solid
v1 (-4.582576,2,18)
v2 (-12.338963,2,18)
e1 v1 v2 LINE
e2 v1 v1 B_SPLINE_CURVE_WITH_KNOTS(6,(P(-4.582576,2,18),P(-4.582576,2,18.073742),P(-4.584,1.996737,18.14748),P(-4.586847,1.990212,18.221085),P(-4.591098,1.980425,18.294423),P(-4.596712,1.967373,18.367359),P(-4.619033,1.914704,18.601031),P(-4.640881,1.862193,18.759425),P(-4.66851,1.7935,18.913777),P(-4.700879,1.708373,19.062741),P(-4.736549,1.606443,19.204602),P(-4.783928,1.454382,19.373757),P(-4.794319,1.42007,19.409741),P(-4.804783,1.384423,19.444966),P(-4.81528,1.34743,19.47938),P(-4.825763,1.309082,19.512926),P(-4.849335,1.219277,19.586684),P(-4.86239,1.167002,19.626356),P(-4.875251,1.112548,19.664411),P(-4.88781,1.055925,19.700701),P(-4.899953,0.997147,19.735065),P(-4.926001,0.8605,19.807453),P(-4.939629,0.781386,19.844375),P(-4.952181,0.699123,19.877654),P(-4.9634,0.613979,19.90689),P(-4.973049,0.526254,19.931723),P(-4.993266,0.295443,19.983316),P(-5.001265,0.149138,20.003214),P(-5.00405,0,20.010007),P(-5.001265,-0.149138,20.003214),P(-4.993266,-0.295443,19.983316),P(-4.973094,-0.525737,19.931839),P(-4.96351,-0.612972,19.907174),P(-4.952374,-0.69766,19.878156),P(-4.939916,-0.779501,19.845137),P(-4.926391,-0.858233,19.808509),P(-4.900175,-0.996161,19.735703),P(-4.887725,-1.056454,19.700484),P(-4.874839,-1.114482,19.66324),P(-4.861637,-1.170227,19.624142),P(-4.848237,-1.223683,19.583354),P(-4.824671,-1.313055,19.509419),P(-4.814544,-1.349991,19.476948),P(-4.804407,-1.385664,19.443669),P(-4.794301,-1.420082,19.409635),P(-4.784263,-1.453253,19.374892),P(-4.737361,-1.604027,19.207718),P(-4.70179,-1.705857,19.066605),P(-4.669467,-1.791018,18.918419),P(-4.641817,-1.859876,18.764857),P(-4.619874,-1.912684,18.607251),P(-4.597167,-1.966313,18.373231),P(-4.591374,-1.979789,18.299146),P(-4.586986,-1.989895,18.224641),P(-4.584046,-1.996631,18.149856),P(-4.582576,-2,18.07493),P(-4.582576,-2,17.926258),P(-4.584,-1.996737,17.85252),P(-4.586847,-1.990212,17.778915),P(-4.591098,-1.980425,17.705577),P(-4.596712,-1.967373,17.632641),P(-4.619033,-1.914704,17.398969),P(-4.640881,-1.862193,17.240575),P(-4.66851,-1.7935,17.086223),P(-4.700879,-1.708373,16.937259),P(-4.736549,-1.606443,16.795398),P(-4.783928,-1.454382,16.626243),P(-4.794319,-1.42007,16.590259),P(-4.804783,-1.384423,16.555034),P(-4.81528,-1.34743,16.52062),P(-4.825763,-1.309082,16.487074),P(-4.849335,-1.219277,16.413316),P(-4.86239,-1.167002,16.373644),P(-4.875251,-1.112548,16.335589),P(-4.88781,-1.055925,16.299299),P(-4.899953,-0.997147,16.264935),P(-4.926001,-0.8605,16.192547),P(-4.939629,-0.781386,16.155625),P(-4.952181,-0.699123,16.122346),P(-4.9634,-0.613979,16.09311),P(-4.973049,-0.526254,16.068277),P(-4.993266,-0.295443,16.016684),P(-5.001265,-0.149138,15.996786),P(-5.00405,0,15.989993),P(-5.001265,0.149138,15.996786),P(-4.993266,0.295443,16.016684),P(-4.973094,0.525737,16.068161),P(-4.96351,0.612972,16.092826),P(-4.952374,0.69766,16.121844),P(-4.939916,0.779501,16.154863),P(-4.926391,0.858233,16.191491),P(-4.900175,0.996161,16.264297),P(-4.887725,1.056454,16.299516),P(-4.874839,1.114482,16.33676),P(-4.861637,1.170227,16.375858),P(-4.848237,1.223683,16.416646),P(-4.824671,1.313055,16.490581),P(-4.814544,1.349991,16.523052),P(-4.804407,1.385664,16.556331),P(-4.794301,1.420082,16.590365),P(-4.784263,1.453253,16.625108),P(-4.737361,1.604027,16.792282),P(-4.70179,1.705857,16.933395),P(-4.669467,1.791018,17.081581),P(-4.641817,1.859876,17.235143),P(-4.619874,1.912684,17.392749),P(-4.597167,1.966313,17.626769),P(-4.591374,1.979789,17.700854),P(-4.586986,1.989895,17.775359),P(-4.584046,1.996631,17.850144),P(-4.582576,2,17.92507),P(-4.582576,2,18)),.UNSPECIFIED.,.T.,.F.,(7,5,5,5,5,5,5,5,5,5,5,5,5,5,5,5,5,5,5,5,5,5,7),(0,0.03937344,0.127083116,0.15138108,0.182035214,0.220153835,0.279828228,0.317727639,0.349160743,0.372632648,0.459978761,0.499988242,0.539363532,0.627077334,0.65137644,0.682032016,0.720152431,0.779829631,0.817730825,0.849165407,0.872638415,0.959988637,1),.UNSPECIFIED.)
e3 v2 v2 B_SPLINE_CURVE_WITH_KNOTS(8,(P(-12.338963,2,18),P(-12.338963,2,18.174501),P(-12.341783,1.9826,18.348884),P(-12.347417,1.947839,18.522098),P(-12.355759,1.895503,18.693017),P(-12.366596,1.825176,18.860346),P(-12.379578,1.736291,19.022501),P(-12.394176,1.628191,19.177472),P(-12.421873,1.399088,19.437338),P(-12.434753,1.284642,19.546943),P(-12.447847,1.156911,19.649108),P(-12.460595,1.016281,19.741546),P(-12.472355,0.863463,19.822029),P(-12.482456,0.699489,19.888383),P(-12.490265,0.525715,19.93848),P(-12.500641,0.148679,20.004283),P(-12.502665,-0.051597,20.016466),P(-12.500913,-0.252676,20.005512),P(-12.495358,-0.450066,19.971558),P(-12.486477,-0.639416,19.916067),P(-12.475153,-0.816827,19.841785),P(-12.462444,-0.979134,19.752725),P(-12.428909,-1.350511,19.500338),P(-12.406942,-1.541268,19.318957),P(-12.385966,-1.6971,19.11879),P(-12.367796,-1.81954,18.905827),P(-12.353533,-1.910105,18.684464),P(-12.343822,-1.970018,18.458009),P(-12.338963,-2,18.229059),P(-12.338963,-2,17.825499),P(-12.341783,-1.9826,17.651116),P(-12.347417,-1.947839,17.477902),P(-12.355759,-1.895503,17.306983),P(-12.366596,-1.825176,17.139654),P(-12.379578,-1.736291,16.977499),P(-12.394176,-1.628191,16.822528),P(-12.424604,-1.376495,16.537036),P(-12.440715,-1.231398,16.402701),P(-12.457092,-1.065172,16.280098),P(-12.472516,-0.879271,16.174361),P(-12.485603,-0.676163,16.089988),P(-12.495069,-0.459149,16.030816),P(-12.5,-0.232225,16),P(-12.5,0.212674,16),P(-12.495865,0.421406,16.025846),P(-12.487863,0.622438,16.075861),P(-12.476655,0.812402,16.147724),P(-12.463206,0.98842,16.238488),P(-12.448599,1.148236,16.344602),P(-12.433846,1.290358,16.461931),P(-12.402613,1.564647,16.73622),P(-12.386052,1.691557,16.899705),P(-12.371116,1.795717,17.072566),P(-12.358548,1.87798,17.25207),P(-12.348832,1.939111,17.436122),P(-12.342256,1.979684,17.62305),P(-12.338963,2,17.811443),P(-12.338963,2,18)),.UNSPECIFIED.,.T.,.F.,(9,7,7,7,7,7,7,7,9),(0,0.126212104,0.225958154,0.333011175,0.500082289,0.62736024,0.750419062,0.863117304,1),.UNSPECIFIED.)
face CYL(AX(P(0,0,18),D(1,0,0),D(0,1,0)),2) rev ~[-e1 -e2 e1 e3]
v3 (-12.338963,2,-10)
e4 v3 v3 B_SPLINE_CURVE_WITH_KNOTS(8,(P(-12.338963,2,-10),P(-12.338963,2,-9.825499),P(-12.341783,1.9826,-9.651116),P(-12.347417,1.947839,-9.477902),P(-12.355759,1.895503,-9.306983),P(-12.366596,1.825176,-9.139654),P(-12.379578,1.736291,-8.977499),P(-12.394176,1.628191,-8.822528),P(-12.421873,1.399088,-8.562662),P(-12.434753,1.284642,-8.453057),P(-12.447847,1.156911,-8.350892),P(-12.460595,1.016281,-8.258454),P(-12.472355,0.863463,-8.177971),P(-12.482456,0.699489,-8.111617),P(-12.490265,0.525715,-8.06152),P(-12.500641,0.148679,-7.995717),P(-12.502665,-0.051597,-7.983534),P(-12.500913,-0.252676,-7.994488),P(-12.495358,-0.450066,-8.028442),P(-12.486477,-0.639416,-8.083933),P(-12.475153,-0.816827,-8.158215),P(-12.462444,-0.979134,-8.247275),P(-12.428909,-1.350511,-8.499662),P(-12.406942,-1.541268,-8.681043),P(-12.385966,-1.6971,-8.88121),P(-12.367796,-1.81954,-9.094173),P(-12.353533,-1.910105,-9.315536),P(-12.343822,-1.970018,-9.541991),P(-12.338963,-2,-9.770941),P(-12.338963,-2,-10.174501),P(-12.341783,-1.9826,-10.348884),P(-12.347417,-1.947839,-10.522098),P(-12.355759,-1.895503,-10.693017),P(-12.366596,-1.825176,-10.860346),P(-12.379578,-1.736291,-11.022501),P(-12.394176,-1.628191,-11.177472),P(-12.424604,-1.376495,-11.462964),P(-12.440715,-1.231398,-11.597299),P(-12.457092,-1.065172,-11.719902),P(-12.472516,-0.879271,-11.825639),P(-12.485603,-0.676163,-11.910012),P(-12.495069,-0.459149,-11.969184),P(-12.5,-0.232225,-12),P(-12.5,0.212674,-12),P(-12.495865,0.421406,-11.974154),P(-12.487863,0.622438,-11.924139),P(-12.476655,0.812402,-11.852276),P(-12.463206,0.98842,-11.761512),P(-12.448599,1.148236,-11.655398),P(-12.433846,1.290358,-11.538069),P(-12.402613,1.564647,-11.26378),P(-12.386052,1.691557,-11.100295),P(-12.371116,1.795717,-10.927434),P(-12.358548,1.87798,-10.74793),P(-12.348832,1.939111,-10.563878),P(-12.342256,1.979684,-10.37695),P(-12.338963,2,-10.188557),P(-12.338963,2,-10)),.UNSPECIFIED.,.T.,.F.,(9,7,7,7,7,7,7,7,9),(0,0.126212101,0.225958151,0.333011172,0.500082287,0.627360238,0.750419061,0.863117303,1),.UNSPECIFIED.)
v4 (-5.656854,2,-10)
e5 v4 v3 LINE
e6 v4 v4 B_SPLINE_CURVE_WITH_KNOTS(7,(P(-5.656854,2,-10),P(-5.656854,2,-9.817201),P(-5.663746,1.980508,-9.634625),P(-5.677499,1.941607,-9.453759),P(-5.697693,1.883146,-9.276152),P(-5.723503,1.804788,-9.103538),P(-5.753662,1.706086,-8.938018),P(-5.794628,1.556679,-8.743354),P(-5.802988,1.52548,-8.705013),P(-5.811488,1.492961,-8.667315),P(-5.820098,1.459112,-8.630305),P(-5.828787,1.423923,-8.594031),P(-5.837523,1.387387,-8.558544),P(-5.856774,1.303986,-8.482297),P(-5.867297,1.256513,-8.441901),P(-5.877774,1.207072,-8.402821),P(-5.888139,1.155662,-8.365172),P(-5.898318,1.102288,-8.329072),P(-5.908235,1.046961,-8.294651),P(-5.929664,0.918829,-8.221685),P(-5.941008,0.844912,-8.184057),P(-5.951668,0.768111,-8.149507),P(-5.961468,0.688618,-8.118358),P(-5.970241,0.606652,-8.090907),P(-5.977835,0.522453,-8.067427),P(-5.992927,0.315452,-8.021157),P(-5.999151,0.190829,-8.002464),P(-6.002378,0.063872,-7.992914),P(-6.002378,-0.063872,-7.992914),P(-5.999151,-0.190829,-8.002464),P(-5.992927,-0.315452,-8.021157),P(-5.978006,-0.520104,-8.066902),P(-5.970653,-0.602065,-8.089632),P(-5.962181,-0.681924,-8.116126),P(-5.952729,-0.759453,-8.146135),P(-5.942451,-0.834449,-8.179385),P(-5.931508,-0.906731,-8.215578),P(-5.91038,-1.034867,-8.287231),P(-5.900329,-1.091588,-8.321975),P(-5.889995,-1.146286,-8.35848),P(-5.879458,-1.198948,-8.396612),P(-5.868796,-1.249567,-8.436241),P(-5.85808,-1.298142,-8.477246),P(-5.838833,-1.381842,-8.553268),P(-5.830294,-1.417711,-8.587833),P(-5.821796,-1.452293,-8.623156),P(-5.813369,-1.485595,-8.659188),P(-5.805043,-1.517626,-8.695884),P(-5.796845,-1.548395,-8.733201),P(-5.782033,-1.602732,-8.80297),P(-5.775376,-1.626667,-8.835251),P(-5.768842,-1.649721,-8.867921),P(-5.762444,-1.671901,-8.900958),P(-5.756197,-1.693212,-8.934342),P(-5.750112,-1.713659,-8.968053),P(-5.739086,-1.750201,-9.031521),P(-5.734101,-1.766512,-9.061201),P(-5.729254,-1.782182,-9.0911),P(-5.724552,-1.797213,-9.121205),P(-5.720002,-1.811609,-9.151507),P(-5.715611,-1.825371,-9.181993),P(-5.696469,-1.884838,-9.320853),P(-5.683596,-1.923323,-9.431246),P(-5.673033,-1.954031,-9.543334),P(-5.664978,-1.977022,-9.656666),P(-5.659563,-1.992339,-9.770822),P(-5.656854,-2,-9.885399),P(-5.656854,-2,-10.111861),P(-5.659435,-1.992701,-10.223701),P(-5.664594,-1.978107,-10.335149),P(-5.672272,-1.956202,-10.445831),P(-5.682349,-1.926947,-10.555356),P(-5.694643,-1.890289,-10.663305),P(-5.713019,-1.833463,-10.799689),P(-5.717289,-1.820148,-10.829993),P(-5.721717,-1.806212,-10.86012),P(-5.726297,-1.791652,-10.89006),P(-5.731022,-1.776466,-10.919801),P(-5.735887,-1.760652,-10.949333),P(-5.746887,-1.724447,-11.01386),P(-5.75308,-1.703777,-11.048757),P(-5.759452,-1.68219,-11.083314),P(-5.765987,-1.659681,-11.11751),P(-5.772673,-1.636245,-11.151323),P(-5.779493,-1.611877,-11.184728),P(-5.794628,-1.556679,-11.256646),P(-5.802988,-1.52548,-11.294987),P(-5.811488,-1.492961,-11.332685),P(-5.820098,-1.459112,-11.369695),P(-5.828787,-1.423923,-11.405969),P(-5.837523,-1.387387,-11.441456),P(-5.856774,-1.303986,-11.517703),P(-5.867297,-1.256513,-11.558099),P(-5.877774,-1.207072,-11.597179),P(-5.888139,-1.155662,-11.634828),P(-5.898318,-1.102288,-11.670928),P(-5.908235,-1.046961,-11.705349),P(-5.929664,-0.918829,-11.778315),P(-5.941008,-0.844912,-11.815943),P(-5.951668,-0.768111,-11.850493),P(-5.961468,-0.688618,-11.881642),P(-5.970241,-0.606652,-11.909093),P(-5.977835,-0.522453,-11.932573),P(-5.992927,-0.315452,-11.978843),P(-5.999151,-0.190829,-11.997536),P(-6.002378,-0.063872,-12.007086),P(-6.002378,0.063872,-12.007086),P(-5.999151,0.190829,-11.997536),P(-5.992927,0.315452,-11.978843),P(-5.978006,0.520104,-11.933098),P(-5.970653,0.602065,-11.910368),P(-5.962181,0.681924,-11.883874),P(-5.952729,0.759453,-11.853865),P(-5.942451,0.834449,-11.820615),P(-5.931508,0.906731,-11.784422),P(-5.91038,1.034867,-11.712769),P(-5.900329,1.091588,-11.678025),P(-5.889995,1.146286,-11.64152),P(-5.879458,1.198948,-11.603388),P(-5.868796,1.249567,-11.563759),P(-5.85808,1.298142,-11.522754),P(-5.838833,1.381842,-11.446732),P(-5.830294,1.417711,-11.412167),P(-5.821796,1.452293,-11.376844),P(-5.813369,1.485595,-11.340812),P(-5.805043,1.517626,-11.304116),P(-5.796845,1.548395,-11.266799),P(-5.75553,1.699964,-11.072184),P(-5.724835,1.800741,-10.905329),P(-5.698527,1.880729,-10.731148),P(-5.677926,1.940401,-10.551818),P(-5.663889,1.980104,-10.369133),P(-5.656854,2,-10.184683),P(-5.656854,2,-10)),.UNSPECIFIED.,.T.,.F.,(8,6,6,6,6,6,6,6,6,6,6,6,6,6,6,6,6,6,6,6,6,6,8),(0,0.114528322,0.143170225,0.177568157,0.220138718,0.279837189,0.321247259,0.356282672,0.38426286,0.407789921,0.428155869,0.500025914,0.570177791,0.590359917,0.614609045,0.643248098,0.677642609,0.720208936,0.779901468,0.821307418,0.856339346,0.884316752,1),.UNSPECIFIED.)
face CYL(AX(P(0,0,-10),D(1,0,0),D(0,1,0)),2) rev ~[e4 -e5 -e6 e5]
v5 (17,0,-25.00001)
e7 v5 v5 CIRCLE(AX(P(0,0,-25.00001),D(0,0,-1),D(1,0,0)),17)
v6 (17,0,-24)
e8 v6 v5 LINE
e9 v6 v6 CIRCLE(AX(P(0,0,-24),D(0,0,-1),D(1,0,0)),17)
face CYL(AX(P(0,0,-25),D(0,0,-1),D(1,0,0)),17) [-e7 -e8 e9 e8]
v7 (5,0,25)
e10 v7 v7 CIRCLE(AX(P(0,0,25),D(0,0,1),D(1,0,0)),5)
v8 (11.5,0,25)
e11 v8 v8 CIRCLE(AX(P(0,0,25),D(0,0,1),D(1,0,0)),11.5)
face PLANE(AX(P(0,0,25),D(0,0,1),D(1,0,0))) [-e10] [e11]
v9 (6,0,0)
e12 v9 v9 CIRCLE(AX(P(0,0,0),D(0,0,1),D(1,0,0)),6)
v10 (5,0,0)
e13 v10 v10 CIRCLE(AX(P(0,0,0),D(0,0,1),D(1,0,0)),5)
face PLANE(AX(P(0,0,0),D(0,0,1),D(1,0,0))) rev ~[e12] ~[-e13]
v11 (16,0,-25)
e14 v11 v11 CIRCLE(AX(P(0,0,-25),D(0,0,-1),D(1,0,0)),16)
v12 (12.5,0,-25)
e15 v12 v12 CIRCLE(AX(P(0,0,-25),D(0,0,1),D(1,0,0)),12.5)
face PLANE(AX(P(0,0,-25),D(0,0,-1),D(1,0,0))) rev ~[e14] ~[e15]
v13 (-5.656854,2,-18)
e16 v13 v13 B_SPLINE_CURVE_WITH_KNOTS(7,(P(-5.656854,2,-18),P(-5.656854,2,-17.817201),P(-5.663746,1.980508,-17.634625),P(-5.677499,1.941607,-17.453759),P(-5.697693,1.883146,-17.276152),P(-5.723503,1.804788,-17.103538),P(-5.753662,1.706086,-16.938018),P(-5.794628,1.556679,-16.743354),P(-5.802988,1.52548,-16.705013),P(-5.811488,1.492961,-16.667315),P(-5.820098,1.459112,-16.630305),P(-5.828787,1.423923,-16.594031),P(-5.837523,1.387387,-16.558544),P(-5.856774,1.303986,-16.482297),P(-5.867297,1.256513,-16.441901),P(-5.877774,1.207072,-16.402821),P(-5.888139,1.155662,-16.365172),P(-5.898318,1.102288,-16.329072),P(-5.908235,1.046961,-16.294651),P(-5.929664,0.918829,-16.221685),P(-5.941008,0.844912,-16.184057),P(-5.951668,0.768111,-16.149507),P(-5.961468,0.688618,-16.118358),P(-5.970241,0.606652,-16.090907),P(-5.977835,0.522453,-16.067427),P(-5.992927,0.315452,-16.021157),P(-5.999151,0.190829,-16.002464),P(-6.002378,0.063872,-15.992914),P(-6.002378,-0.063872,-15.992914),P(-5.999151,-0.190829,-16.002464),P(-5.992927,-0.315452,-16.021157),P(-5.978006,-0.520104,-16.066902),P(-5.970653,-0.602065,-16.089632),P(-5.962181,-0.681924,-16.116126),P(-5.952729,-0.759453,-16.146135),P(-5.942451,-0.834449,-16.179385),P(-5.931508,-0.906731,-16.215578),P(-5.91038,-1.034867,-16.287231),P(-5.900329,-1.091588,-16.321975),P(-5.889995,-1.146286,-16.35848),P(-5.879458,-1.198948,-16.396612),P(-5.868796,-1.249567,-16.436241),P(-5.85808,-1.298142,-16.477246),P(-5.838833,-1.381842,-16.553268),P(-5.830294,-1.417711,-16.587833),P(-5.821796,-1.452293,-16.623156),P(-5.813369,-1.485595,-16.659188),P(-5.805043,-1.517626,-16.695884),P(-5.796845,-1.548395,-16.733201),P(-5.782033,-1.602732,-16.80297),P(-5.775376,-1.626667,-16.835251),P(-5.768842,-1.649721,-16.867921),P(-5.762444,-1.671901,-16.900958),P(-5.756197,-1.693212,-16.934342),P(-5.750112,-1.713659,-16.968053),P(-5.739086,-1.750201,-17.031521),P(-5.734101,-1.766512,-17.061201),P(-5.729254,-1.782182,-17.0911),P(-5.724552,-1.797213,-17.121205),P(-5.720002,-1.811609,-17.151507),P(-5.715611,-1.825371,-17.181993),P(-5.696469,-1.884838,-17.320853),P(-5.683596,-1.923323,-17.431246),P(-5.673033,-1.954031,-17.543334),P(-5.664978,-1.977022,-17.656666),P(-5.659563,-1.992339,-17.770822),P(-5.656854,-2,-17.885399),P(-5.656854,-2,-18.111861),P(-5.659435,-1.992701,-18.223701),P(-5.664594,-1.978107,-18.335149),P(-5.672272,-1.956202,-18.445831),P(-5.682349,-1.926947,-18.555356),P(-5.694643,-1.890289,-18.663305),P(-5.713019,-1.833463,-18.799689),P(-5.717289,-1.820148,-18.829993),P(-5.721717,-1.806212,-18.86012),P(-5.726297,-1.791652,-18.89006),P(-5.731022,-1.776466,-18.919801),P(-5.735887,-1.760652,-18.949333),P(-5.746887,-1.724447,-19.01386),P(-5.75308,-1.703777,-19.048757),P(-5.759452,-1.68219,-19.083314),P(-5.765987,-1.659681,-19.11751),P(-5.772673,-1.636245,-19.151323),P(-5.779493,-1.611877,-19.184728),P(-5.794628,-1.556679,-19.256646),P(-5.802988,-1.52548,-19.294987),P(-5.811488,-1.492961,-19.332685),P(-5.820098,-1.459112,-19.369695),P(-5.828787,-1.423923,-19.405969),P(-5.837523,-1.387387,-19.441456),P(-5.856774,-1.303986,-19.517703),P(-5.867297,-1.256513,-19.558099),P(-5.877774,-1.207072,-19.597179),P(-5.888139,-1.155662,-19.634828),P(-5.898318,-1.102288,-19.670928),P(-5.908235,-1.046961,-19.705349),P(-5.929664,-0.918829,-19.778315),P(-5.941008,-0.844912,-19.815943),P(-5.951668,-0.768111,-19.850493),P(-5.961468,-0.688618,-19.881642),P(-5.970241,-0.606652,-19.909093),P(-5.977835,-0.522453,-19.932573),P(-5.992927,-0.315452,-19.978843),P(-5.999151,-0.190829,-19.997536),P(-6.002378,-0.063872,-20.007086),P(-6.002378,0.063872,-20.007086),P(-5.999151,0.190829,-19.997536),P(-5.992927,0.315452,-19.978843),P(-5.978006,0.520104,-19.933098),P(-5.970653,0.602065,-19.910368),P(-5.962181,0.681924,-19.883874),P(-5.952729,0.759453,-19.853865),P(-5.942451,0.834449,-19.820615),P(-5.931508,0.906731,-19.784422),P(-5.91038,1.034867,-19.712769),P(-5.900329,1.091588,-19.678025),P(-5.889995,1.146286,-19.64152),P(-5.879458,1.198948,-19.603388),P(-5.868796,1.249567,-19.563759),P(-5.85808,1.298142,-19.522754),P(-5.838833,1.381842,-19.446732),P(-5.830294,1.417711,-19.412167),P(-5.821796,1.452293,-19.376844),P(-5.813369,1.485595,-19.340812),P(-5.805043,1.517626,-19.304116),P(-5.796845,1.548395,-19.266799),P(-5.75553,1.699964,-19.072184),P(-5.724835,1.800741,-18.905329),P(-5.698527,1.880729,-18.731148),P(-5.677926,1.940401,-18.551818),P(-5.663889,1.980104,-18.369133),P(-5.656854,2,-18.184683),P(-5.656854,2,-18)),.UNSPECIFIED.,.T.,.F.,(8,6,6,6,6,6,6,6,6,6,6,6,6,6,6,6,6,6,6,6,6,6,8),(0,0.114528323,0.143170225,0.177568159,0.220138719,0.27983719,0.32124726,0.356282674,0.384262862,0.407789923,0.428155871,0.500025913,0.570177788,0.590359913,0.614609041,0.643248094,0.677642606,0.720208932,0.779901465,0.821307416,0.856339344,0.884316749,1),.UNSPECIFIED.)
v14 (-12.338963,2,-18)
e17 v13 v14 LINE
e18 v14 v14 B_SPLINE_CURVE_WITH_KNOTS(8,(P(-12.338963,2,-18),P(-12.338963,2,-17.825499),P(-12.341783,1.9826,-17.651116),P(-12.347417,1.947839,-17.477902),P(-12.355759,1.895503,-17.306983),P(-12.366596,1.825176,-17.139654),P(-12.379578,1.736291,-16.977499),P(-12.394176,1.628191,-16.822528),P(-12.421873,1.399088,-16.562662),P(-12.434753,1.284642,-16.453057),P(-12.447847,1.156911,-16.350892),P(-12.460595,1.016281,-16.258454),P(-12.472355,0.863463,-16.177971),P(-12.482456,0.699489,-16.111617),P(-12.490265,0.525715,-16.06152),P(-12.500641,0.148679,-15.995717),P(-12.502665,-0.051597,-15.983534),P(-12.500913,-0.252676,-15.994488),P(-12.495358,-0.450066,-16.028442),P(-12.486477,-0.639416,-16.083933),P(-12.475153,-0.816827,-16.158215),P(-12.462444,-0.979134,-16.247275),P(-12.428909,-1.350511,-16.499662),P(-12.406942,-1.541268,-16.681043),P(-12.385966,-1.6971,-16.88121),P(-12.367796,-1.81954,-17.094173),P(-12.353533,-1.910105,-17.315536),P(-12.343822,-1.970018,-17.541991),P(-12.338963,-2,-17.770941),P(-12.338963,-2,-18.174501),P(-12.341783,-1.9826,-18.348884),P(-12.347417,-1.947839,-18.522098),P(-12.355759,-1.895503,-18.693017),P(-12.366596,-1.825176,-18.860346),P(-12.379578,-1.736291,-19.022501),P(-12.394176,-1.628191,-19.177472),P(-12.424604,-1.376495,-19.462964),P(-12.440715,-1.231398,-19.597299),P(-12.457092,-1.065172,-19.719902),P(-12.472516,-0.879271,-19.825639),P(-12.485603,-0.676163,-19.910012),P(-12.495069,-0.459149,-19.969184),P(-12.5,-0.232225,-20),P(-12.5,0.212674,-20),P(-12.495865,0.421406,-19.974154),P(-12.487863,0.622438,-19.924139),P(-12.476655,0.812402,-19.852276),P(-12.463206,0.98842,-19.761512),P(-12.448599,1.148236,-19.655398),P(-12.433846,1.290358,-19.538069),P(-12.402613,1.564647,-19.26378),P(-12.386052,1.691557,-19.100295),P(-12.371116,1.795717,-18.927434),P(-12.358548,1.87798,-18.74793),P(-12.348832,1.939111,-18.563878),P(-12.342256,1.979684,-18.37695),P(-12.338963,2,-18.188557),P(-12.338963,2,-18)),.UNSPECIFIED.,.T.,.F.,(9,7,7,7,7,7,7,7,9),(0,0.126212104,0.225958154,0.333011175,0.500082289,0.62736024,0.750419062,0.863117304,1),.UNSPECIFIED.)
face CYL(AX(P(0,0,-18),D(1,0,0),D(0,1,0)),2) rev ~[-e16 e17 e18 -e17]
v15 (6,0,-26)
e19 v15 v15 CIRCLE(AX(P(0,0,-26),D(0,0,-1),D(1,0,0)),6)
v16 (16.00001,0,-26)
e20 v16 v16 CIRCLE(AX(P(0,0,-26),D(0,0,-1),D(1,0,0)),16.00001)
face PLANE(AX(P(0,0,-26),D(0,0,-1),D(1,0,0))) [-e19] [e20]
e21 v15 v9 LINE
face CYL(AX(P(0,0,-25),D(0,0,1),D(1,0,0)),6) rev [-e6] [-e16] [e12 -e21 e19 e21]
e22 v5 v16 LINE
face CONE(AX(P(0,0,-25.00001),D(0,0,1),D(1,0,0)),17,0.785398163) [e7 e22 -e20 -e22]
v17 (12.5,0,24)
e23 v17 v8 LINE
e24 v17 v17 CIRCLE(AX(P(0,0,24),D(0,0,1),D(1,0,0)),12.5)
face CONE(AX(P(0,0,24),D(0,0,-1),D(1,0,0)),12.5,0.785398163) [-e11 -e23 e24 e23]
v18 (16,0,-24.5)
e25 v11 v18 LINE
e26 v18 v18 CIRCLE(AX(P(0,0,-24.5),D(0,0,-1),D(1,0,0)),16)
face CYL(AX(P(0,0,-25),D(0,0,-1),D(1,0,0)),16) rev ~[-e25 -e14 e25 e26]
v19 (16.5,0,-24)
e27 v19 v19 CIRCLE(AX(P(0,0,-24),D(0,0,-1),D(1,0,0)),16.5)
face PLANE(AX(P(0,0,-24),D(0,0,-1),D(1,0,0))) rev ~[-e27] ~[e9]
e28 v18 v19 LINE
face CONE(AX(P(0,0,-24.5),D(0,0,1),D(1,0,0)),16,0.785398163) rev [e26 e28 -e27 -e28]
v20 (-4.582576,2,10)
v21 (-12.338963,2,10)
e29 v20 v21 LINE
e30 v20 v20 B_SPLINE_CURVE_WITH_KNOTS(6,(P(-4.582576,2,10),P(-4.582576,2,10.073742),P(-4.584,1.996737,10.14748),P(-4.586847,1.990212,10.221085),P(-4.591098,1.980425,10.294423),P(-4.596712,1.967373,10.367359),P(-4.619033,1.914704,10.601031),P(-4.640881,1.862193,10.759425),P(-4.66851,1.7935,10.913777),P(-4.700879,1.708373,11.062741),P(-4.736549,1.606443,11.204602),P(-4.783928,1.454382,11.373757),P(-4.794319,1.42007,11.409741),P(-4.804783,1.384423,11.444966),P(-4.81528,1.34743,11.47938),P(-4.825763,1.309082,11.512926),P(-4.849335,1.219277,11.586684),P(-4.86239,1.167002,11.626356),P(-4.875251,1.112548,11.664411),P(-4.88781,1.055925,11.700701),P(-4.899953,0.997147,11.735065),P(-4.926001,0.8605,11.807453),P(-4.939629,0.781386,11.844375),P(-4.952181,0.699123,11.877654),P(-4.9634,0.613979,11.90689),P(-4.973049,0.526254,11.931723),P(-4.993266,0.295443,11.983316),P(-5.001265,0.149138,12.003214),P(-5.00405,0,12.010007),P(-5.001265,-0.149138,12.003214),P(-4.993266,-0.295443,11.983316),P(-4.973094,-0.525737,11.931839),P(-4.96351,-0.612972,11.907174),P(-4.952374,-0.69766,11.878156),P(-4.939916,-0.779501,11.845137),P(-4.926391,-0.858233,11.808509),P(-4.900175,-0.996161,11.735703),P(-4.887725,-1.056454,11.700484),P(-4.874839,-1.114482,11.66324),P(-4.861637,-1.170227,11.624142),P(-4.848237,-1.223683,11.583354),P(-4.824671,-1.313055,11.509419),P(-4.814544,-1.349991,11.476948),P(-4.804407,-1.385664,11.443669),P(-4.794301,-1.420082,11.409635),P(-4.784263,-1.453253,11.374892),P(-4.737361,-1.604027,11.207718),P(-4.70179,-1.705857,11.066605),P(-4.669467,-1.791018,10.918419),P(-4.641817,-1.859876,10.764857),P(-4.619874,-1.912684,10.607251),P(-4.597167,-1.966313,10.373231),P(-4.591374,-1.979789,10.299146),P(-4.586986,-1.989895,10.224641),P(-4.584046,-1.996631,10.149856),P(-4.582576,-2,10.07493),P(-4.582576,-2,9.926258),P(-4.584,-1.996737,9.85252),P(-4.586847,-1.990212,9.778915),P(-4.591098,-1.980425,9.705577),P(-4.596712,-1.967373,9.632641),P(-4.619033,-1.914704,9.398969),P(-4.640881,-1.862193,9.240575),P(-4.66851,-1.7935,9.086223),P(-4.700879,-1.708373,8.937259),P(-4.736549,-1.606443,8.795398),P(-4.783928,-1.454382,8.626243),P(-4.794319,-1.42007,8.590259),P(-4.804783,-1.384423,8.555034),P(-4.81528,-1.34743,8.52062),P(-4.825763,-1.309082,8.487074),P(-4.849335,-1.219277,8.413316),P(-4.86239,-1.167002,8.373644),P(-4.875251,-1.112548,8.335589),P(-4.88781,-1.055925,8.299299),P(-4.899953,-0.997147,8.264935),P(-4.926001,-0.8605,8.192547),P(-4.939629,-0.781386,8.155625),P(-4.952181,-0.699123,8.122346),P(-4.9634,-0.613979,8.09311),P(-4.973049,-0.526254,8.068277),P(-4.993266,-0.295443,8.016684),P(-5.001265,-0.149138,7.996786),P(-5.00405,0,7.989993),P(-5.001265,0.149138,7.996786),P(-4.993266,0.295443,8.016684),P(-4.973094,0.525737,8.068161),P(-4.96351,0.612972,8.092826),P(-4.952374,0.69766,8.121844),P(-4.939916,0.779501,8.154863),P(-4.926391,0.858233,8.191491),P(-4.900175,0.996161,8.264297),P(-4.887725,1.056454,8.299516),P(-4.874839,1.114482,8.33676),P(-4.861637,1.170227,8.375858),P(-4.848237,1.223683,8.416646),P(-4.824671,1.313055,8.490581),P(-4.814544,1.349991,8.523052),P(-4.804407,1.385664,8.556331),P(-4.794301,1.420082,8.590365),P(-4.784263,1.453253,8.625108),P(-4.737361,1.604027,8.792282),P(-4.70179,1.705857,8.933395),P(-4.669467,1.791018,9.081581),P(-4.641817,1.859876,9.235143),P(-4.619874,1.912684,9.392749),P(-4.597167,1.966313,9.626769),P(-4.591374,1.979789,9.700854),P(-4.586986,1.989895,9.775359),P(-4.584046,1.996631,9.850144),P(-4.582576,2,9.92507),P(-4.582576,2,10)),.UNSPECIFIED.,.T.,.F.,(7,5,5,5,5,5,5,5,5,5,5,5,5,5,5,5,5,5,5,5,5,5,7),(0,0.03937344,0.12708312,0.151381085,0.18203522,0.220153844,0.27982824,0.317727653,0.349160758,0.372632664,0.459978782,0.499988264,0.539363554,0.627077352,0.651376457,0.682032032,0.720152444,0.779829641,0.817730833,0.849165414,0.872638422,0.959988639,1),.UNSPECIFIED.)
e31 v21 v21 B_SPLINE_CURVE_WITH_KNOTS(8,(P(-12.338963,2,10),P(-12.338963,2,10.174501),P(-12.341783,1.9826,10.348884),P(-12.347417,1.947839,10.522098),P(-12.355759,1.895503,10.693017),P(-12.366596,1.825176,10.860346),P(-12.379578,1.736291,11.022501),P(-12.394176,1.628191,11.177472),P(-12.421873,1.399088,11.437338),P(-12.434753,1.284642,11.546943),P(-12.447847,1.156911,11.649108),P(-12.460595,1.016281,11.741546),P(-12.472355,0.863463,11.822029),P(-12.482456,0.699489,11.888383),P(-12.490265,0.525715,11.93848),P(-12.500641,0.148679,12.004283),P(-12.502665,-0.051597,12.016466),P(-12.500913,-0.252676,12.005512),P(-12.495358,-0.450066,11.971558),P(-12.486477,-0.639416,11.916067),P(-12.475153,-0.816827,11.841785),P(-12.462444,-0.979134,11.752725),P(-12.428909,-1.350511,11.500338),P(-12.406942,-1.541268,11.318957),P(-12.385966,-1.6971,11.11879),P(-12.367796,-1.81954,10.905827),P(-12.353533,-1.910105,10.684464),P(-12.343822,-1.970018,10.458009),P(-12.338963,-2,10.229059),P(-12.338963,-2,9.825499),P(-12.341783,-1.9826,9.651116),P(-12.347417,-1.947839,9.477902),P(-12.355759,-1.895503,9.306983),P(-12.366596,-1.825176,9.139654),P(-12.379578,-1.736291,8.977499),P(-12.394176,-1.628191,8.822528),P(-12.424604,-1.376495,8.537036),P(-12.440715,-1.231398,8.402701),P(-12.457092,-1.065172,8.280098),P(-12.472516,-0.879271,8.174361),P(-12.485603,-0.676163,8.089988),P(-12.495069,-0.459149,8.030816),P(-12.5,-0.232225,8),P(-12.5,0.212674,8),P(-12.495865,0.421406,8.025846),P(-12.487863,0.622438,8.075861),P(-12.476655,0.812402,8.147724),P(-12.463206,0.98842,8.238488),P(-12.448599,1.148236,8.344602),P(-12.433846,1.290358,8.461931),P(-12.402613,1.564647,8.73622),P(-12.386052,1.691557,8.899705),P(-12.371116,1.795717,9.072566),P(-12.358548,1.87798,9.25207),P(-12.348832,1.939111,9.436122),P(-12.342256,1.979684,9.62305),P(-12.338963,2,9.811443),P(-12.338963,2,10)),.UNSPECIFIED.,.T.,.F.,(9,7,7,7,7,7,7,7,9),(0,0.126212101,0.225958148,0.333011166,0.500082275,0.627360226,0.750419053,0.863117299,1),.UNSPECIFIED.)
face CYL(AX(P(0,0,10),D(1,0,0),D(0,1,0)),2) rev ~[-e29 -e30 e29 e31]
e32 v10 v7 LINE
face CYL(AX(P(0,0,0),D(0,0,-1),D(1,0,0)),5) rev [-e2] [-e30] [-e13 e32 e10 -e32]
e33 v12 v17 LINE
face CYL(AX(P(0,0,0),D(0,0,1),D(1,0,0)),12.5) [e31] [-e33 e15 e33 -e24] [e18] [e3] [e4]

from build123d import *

# Parameters (mm, degrees)
F0_R     = 12.5
F0_R_2   = 6
F0_R_3   = 5
F1_DEPTH = 25
F2_DEPTH = 25
F3_R     = 2
F4_DEPTH = 25
F5_SIZE  = 1
F6_R     = 17
F6_R_2   = 16
F6_R_3   = 12.5
F6_R_4   = 6
F7_DEPTH = 1
F8_DEPTH = 1
F9_SIZE  = 0.5
F10_SIZE = 0.99999


# Not quite as in the source:
# - a fillet or chamfer is up to 0.001 mm smaller than in the source, because OpenCascade refuses the exact size


with BuildPart() as f1:
    # F0 (on Top) → F1 (new body)
    with BuildSketch(Plane.XY):
        Circle(F0_R)
        Circle(F0_R_2, mode=Mode.SUBTRACT)
        Circle(F0_R_2)
        Circle(F0_R_3, mode=Mode.SUBTRACT)
    extrude(amount=F1_DEPTH)

    # F0 (on Top) → F2 (join)
    with BuildSketch(Plane.XY):
        Circle(F0_R)
        Circle(F0_R_2, mode=Mode.SUBTRACT)
    extrude(amount=-F2_DEPTH)

    # F3 (on Right) → F4 (cut)
    with BuildSketch(Plane.YZ):
        with Locations((0, -18)):
            Circle(F3_R)
        with Locations((0, -10)):
            Circle(F3_R)
        with Locations((0, 10)):
            Circle(F3_R)
        with Locations((0, 18)):
            Circle(F3_R)
    extrude(amount=-F4_DEPTH, mode=Mode.SUBTRACT)

    # F5
    f5_edges = [f1.edges().sort_by_distance(p)[0] for p in [
        (-12.5, 0, 25),
    ]]
    chamfer(f5_edges, length=F5_SIZE)

    # F6 (on face) → F7 (join)
    with BuildSketch(Plane(origin=(0, 0, -25), x_dir=(1, 0, 0), z_dir=(0, 0, -1))):
        Circle(F6_R)
        Circle(F6_R_2, mode=Mode.SUBTRACT)
        Circle(F6_R_2)
        Circle(F6_R_3, mode=Mode.SUBTRACT)
        Circle(F6_R_3)
        Circle(F6_R_4, mode=Mode.SUBTRACT)
    extrude(amount=F7_DEPTH)

    # F6 (on face) → F8 (join)
    with BuildSketch(Plane(origin=(0, 0, -25), x_dir=(1, 0, 0), z_dir=(0, 0, -1))):
        Circle(F6_R)
        Circle(F6_R_2, mode=Mode.SUBTRACT)
    extrude(amount=-F8_DEPTH)

    # F9
    f9_edges = [f1.edges().sort_by_distance(p)[0] for p in [
        (-16, 0, -24),
    ]]
    chamfer(f9_edges, length=F9_SIZE)

    # F10 (size 1 in the source; OpenCascade refuses exactly that, so slightly less here)
    f10_edges = [f1.edges().sort_by_distance(p)[0] for p in [
        (-17, 0, -26),
    ]]
    chamfer(f10_edges, length=F10_SIZE)


solid = f1.part
